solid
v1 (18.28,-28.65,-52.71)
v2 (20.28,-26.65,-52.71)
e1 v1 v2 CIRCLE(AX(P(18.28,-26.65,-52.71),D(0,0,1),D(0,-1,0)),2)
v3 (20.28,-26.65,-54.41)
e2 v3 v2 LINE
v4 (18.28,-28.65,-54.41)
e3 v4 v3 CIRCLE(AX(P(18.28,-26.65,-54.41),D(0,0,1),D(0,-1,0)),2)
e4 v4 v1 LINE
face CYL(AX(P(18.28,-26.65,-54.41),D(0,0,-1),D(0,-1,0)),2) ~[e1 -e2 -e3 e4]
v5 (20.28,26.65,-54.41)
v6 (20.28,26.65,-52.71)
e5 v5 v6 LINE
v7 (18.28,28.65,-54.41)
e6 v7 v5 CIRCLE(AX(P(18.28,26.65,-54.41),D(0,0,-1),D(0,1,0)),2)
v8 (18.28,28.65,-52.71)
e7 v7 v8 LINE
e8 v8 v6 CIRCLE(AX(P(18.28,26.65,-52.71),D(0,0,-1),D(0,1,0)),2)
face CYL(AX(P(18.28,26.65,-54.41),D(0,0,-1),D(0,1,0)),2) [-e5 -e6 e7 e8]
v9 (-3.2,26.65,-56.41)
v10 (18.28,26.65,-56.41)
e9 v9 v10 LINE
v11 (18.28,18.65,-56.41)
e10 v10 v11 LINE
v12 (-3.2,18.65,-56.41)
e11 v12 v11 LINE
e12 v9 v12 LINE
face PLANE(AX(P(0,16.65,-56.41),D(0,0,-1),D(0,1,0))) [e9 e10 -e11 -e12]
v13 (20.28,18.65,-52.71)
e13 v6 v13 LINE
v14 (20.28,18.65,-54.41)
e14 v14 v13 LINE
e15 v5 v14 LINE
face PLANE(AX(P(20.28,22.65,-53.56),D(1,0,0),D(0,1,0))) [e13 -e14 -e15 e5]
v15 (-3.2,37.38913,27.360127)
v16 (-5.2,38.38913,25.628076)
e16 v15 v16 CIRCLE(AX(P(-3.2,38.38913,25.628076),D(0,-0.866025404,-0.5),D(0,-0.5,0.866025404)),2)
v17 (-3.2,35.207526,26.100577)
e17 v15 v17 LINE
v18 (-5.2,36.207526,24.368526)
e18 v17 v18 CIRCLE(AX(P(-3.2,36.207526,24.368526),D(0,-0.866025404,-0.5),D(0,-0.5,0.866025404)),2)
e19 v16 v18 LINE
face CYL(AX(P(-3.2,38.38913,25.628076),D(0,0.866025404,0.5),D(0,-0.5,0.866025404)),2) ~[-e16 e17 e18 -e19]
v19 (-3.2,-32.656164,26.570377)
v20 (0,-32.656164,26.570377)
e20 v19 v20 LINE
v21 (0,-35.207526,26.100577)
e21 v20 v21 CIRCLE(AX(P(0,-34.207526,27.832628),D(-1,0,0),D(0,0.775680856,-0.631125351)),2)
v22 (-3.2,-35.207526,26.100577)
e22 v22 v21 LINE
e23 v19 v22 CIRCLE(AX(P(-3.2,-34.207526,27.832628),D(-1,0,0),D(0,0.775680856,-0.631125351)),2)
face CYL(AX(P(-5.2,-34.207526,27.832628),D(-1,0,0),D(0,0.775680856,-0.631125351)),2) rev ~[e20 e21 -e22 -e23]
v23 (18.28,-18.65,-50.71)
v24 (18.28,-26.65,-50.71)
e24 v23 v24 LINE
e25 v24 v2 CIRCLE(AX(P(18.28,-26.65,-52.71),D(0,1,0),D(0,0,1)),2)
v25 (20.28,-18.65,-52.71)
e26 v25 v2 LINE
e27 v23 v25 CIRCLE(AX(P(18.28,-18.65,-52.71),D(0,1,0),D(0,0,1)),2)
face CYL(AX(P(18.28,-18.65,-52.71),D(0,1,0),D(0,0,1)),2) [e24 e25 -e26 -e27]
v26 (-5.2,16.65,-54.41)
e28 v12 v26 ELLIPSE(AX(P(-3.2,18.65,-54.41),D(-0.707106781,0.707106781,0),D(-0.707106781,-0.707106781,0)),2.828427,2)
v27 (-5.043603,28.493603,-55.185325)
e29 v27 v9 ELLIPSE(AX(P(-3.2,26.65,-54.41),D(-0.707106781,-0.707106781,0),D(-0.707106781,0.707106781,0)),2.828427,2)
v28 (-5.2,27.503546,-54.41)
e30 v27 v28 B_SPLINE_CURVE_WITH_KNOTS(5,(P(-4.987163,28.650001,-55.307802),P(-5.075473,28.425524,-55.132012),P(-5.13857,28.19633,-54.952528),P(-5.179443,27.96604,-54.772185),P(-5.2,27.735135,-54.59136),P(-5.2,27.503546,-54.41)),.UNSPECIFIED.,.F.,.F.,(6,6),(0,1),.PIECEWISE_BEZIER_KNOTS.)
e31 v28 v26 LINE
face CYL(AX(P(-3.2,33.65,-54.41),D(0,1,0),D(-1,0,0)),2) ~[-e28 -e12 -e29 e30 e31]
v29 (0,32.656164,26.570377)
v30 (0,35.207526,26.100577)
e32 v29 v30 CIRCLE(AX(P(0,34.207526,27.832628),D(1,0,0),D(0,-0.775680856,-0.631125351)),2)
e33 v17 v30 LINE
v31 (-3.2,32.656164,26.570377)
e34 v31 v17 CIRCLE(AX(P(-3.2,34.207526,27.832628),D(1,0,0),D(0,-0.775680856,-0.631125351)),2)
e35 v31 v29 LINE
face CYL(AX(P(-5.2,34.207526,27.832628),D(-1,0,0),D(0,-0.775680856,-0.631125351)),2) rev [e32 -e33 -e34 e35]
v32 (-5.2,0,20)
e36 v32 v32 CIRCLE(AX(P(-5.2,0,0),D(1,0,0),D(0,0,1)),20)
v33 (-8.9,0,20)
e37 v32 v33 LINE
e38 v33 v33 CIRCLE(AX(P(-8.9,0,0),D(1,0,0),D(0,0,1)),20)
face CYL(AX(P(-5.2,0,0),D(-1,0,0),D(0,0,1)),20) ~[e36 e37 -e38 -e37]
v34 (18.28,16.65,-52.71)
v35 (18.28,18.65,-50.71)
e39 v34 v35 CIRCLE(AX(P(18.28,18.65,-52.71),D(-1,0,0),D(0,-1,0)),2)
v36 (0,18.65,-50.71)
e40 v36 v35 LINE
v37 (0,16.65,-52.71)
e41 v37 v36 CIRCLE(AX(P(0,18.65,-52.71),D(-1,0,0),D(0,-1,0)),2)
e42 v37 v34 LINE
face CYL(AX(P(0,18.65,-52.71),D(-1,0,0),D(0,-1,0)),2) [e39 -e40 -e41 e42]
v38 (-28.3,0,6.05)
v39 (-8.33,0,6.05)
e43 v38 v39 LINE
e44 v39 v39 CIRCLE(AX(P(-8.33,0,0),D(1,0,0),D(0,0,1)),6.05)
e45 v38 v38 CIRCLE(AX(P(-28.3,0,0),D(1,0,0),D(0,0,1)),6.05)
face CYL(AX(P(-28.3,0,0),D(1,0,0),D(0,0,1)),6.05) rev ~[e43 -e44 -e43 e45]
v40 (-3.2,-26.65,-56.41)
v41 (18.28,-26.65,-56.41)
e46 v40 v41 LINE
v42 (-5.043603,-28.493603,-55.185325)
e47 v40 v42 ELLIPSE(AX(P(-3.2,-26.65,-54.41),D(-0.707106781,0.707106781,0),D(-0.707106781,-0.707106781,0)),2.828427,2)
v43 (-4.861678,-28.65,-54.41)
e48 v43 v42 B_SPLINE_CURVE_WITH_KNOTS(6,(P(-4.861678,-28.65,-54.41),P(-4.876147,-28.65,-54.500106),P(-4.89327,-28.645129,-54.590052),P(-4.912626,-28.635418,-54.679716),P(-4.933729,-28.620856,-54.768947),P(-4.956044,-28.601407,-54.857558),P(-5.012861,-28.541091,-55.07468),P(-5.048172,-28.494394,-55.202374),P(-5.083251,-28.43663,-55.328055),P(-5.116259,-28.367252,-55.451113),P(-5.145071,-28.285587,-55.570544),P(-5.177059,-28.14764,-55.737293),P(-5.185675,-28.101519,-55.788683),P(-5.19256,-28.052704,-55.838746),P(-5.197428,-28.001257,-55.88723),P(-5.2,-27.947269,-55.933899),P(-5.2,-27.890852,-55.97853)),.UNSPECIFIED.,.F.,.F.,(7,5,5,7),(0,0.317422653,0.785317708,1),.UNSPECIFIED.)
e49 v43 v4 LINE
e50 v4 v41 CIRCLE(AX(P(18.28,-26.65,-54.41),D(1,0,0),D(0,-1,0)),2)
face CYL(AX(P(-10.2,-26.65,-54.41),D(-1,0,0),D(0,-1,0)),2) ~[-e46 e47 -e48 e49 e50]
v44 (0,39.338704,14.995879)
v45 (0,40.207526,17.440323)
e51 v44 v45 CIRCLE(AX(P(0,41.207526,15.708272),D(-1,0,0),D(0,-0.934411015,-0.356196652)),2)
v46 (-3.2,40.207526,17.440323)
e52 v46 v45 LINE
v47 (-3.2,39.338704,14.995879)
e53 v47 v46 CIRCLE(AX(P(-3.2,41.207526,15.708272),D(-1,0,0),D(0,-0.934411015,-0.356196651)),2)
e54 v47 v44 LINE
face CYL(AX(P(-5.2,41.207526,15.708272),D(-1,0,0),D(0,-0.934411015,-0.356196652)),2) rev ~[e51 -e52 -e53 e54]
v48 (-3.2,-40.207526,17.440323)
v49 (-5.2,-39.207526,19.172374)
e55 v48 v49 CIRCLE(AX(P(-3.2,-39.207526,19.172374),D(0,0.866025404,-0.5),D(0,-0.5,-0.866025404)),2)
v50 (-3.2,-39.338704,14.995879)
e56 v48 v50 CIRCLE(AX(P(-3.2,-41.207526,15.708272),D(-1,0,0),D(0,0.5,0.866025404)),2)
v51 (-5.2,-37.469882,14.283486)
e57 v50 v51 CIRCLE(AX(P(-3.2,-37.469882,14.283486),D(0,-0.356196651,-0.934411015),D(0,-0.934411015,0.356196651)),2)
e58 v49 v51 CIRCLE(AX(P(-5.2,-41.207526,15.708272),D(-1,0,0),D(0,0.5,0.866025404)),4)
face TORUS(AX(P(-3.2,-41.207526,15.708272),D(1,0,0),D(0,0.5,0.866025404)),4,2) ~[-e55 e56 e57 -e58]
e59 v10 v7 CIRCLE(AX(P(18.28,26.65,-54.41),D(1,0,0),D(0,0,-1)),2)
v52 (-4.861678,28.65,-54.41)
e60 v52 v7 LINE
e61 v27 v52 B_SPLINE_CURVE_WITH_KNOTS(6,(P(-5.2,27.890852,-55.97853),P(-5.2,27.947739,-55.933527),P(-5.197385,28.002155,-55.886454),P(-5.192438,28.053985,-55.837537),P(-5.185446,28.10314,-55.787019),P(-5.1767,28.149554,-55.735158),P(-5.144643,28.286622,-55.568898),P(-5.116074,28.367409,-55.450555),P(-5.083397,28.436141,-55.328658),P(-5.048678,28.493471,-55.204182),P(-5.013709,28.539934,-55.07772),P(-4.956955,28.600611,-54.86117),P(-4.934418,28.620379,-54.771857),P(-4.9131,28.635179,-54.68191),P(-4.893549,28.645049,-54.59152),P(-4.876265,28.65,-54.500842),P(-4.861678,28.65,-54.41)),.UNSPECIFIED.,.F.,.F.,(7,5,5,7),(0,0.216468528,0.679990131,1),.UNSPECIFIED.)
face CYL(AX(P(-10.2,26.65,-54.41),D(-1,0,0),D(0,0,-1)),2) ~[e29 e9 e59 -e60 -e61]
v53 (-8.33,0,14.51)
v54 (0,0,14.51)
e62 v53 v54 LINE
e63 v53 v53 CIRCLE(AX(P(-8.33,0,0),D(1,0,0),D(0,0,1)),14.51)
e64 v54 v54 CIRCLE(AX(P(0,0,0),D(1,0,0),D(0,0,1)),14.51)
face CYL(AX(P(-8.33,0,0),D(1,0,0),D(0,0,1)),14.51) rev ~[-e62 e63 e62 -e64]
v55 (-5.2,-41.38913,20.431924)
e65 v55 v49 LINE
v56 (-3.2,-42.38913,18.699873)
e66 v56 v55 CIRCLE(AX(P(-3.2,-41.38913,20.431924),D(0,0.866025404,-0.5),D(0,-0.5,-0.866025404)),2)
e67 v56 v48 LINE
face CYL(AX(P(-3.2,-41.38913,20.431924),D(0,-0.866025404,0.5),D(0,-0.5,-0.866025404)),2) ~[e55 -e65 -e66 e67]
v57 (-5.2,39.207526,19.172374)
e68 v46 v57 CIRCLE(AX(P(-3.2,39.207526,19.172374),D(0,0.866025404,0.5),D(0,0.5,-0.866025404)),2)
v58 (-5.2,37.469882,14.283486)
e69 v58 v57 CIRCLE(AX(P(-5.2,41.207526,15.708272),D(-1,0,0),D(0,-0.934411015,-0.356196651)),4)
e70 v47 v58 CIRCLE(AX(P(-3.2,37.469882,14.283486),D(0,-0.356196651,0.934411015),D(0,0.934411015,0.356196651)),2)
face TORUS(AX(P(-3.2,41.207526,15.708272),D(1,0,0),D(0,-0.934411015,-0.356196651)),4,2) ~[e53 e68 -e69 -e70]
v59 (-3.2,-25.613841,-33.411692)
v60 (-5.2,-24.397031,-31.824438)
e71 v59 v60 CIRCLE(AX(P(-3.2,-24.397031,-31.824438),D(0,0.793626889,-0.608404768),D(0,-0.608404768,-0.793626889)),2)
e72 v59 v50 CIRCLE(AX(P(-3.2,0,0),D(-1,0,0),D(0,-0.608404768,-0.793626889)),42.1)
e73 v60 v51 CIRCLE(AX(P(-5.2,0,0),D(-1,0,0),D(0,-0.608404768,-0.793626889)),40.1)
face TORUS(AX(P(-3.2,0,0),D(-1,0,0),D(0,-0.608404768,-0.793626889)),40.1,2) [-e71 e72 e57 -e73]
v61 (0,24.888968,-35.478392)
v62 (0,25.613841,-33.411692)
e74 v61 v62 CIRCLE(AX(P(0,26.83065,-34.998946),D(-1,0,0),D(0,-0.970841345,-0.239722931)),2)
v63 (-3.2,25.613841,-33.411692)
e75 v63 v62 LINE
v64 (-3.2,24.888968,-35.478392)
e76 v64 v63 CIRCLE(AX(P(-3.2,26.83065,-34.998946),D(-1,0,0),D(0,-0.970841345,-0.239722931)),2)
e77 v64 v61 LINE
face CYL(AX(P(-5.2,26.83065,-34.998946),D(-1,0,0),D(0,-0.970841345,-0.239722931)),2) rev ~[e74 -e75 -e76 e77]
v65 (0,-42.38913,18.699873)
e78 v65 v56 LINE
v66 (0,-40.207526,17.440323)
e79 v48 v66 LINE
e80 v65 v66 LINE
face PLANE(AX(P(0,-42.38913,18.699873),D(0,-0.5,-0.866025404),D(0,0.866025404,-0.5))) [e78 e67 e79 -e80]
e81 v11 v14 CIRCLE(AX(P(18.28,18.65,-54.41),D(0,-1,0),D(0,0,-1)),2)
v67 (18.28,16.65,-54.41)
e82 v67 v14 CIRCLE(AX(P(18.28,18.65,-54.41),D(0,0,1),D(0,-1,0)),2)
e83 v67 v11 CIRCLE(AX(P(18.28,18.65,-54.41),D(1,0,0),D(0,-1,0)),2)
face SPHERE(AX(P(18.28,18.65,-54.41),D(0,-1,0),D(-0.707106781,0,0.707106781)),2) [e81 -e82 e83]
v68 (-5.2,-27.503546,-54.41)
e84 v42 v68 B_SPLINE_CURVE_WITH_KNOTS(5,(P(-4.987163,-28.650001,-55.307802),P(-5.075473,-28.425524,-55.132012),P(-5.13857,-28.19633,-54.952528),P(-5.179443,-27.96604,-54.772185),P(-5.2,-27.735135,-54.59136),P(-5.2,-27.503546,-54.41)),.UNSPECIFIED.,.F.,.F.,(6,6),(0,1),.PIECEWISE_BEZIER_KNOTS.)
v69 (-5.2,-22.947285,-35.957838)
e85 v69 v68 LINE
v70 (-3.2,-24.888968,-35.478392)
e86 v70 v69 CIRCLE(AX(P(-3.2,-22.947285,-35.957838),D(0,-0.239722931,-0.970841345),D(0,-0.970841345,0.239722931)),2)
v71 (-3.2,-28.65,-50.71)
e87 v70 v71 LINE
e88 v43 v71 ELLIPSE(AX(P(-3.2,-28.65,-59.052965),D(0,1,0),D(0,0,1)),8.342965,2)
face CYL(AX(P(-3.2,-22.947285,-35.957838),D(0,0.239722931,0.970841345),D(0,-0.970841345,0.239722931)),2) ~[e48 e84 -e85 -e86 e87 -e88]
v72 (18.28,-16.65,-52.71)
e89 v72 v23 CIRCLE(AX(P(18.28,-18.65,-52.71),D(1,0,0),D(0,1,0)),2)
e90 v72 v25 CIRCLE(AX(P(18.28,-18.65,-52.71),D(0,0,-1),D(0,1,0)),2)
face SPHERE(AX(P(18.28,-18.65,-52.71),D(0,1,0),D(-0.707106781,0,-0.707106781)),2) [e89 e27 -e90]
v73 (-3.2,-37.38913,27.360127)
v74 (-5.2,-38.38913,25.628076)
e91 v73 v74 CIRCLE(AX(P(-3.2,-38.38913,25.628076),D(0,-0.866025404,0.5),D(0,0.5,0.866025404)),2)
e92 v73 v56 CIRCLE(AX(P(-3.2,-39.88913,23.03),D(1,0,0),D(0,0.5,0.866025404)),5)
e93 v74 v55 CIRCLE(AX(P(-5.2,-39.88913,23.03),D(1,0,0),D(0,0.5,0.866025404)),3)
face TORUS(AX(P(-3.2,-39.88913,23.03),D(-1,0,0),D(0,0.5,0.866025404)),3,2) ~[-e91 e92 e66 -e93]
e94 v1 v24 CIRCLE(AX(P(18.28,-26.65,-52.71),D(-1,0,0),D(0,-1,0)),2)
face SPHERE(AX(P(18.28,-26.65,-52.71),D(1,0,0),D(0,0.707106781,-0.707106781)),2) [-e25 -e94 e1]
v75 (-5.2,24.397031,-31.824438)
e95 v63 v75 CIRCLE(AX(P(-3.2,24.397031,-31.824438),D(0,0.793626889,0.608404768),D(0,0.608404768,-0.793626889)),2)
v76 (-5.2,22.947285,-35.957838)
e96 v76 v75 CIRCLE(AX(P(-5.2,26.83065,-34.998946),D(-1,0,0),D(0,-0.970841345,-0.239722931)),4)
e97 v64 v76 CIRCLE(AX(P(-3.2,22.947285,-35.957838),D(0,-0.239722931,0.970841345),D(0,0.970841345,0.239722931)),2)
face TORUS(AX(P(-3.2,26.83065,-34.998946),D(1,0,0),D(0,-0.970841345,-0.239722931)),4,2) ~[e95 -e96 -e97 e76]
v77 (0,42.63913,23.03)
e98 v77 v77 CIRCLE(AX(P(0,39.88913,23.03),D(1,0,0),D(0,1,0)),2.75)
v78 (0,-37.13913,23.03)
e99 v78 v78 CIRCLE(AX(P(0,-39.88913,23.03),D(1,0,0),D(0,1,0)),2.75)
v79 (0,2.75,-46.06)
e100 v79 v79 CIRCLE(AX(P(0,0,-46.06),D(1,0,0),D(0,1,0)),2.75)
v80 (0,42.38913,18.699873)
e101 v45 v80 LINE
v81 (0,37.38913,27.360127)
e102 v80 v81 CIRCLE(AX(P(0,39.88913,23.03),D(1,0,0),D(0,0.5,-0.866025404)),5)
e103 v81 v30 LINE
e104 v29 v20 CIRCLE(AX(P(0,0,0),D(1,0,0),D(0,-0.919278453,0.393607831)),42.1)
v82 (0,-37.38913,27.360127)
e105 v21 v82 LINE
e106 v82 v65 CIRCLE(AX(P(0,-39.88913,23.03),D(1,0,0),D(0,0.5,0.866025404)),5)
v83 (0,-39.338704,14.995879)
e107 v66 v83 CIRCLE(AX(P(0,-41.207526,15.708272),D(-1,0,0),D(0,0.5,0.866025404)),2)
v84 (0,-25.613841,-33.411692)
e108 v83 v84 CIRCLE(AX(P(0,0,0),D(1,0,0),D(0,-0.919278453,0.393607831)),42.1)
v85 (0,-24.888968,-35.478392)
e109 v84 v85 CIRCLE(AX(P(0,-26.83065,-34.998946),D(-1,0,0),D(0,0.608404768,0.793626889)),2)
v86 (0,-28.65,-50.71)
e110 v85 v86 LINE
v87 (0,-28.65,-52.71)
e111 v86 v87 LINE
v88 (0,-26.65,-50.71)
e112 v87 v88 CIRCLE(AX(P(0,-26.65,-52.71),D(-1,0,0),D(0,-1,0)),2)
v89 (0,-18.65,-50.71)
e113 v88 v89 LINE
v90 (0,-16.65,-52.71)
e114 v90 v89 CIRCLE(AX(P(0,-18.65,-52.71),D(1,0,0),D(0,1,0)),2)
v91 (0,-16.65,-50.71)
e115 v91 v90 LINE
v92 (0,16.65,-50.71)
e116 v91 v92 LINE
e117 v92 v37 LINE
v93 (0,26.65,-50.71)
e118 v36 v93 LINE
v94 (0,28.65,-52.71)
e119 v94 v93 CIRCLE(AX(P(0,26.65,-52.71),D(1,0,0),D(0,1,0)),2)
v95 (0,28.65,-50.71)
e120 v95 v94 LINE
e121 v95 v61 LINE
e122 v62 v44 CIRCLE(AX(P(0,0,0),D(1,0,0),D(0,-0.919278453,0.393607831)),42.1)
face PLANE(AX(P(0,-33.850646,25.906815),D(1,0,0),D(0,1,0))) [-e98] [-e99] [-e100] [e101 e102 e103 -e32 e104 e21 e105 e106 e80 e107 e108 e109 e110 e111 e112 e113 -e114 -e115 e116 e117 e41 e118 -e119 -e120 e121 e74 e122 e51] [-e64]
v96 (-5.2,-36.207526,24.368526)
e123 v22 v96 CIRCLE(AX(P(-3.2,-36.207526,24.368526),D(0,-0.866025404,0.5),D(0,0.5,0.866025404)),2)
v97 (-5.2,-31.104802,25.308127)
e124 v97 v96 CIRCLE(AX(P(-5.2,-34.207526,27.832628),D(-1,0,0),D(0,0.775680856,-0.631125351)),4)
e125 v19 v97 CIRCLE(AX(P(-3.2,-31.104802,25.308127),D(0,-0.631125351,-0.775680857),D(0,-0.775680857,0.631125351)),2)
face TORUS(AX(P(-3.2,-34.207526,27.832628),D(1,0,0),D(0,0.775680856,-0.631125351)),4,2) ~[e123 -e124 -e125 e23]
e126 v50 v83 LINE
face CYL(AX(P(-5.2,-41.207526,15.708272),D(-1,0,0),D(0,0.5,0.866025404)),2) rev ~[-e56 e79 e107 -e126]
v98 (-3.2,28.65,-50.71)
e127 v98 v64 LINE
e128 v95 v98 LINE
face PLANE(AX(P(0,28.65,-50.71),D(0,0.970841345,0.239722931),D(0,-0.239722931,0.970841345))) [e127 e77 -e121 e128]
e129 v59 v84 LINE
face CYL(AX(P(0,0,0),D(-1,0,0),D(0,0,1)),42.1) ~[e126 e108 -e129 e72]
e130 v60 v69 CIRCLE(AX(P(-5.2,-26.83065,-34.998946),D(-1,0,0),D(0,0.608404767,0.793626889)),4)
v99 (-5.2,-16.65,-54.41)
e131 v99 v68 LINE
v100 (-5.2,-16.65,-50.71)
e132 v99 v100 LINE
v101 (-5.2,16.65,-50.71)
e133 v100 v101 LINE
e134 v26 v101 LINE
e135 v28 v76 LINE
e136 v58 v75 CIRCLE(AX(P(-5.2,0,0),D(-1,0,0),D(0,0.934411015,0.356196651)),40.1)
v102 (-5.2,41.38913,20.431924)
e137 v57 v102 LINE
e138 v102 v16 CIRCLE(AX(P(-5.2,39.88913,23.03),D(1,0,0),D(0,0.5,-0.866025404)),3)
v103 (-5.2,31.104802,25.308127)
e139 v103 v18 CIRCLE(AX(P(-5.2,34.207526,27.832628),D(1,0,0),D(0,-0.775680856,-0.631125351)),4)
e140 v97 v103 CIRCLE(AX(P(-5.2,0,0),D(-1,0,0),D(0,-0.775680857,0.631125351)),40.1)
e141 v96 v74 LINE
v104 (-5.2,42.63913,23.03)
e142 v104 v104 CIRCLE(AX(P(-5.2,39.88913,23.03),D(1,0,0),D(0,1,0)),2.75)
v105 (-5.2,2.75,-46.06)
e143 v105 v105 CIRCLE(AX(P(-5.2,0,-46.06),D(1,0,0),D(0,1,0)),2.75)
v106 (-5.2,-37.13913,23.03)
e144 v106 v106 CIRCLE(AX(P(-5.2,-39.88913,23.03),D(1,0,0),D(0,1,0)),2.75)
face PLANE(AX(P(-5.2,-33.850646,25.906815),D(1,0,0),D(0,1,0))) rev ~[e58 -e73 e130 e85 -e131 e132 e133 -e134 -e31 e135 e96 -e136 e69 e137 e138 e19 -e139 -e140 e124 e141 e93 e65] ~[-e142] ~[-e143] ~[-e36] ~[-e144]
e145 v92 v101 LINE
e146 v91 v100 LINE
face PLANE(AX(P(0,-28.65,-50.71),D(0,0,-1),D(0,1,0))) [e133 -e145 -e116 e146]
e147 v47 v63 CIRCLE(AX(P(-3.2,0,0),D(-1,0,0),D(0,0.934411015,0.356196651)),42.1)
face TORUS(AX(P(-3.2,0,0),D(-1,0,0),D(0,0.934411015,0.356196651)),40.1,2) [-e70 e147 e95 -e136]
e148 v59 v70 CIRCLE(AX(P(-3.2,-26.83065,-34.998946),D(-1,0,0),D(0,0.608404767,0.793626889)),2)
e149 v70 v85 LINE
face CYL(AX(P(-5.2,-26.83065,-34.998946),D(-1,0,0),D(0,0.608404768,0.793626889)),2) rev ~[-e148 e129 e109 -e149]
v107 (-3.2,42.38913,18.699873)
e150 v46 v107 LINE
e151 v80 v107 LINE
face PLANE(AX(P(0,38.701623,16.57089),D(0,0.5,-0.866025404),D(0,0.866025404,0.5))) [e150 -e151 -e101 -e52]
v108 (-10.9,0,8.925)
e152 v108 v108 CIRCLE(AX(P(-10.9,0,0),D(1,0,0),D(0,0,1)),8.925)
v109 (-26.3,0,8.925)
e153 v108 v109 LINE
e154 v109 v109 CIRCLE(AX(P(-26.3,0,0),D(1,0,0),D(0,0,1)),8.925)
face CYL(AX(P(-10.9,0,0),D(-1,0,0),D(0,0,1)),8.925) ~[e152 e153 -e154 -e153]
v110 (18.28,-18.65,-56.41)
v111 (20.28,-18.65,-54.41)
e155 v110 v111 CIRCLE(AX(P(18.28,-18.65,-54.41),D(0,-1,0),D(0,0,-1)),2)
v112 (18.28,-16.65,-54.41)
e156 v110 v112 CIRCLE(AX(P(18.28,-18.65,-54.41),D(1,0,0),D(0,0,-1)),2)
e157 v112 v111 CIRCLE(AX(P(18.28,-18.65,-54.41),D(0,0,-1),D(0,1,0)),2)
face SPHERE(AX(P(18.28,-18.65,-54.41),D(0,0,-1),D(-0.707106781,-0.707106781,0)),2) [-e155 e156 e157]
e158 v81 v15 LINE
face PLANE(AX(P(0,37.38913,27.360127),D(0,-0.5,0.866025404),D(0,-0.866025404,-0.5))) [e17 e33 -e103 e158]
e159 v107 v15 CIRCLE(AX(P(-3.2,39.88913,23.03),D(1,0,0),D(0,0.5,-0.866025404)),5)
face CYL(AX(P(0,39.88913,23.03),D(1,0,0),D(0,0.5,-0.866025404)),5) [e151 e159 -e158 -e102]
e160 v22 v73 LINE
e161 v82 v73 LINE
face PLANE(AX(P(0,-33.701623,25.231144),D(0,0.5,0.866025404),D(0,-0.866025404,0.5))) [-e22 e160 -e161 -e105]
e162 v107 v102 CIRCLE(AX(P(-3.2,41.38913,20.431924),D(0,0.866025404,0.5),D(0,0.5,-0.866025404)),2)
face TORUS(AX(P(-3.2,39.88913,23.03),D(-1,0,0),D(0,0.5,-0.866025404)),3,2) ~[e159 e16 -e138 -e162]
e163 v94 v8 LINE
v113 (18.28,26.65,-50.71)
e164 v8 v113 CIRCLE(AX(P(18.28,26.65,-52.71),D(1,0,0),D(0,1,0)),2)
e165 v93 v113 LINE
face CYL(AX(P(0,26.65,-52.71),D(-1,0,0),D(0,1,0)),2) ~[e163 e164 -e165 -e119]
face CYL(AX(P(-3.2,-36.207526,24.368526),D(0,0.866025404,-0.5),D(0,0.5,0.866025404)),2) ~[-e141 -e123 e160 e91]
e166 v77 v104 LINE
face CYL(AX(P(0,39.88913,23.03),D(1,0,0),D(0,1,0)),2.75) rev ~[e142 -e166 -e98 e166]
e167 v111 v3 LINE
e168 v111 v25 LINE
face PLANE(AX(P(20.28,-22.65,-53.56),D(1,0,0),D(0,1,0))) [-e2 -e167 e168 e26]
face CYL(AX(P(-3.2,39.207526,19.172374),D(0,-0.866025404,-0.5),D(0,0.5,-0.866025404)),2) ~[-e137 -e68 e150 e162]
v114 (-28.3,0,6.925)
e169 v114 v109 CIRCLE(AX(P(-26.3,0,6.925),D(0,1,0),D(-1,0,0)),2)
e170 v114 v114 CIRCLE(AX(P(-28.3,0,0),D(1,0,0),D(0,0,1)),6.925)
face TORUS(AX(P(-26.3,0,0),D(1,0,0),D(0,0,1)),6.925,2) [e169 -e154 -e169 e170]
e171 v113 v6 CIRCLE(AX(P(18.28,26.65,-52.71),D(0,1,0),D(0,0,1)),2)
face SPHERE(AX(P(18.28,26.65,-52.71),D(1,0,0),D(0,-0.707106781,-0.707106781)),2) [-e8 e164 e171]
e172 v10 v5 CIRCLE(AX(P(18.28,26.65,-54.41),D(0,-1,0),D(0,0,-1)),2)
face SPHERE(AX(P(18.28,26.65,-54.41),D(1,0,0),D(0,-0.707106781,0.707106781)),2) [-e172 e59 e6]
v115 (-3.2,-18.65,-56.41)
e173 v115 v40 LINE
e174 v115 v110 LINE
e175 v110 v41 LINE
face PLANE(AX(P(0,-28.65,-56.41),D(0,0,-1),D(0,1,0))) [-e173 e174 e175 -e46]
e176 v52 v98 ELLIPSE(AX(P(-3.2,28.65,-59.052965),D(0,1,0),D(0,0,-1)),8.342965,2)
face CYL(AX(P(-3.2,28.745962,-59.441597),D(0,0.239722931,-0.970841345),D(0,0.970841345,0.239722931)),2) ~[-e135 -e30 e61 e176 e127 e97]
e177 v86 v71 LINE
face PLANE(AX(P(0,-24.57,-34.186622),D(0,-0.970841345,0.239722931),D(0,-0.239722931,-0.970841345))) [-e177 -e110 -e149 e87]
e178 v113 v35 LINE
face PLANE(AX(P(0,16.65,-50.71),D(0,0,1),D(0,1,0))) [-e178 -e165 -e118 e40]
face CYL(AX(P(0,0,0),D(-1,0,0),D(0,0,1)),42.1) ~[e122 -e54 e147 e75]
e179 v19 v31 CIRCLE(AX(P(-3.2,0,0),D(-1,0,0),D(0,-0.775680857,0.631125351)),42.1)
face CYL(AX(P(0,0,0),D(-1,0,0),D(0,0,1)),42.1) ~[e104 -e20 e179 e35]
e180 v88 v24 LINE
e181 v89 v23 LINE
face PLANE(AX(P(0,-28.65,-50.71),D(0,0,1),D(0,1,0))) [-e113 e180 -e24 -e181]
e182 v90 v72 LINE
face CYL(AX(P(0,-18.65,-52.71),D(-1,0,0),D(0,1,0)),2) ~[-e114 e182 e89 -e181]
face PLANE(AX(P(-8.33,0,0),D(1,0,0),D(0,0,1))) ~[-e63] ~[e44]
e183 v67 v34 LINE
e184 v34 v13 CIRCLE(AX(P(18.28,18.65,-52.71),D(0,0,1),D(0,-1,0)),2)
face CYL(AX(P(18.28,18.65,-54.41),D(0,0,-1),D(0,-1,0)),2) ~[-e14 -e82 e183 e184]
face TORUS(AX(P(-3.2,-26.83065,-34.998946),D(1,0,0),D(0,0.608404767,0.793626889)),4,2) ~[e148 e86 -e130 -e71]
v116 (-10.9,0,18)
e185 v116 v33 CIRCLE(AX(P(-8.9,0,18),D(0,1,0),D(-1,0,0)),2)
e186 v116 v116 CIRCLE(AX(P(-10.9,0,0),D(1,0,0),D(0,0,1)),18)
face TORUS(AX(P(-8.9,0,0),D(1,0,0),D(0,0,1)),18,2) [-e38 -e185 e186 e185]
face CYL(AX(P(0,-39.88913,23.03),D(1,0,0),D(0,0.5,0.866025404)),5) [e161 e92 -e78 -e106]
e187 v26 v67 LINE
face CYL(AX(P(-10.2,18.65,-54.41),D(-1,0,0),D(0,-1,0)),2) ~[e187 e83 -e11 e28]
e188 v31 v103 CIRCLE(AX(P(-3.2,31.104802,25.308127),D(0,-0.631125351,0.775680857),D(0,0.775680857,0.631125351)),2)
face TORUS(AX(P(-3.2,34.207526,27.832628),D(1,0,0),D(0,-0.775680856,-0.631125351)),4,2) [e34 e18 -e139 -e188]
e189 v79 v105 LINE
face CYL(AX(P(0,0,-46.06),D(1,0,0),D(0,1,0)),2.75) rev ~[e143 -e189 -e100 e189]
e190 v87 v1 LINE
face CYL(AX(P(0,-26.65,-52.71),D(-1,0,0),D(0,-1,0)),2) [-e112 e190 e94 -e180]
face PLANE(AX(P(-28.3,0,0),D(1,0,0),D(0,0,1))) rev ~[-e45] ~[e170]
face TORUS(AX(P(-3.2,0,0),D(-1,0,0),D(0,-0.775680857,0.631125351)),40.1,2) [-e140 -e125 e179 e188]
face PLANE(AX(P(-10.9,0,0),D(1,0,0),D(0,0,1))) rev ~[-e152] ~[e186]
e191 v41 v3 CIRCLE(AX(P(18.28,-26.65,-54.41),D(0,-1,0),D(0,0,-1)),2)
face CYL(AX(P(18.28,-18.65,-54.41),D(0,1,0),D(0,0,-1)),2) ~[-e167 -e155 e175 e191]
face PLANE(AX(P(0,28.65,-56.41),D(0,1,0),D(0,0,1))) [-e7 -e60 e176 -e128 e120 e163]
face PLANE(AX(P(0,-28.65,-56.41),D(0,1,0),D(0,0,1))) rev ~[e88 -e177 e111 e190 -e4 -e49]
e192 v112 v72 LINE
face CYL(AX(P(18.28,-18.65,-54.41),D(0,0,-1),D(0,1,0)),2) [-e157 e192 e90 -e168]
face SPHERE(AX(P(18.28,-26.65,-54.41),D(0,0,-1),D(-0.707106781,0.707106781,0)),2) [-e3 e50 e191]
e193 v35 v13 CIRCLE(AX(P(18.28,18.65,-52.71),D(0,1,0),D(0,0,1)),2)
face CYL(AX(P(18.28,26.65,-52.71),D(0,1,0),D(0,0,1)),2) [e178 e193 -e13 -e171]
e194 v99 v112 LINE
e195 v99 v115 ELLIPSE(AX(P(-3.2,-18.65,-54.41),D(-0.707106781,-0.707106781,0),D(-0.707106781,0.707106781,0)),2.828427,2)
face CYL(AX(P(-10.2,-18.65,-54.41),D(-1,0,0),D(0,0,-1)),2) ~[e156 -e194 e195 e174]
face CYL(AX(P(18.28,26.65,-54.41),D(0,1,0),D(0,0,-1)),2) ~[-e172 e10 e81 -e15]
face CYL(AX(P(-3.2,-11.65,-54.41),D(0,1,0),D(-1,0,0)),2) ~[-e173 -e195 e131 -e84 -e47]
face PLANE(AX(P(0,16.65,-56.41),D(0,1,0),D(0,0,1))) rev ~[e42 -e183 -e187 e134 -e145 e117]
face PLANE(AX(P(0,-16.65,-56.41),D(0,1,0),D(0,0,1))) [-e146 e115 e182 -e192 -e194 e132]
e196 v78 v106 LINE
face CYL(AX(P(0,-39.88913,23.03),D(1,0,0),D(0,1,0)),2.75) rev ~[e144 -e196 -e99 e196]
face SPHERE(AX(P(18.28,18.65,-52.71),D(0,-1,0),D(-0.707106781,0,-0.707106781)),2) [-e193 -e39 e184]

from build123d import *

# Parameters (mm, degrees)
F2_R          = 2.75
F3_DEPTH      = 5.2
F4_DEPTH      = 5.2
F5_DEPTH      = 5.2
F2_W          = 12
F2_H          = 5.7
F6_DEPTH      = 20.28
F6_DEPTH_BACK = 5.2
F7_T1_DEPTH   = 5.2
F7_T3_DEPTH   = 1.7
F7_T5_DEPTH   = 18.28
F7_T7_DEPTH   = 8
F7_T9_DEPTH   = 8
F7_T11_DEPTH  = 28.48
F7_T13_DEPTH  = 22
F7_T15_DEPTH  = 22
F7_S19_W      = 2.04
F7_S19_H      = 2.04
F7_T20_DEPTH  = 2.04
F7_S25_W      = 2.04
F7_S25_H      = 2.04
F7_T26_DEPTH  = 2.04
F7_S31_W      = 2.04
F7_S31_H      = 2.04
F7_T32_DEPTH  = 2.04
F7_S37_W      = 2.04
F7_S37_H      = 2.04
F7_T38_DEPTH  = 2.04
F7_S43_W      = 2.04
F7_S43_H      = 2.04
F7_T44_DEPTH  = 2.04
F7_S49_W      = 2.04
F7_S49_H      = 2.04
F7_T50_DEPTH  = 2.04
F7_S55_W      = 2.04
F7_S55_H      = 2.04
F7_T56_DEPTH  = 2.04
F7_S61_W      = 2.04
F7_S61_H      = 2.04
F7_T62_DEPTH  = 2.04
F7_T69_DEPTH  = 2.5190996878
F7_T71_DEPTH  = 2.5190996878
F7_T73_DEPTH  = 24.1890808372
F7_T75_DEPTH  = 24.1890808372
F7_T77_DEPTH  = 2.5190996878
F7_T79_DEPTH  = 2.5190996878
F7_T82_ANGLE  = 73.3925557793
F7_T84_ANGLE  = 101.7336044326
F7_T86_ANGLE  = 180
F7_T88_ANGLE  = 73.3925557793
F7_T90_ANGLE  = 180
F7_T92_ANGLE  = 80.8668022163
F7_T94_ANGLE  = 80.8668022163
F7_T96_ANGLE  = 66.3959416665
F7_T98_ANGLE  = 66.3959416665
F7_T100_ANGLE = 80.8668022163
F7_T102_ANGLE = 80.8668022163


# Not quite as in the source:
# - a fillet or chamfer that OpenCascade refuses, or shapes differently, is made with other operations: its cross-section is extruded or revolved along the edge and cut away or added


with BuildPart() as f1:
    # F0 (on Front) → F1 (revolve)
    with BuildSketch(Plane.XZ):
        Polygon((0, 14.51), (0, 42.1), (-5.2, 42.1), (-5.2, 20), (-10.9, 20), (-10.9, 8.925), (-28.3, 8.925), (-28.3, 6.05), (-8.33, 6.05), (-8.33, 14.51), align=None)
    revolve(axis=Axis((-6.4437054098, 0, 0), (1, 0, 0)))

    # F2 (on Right) → F3 (join, through all)
    with BuildSketch(Plane.YZ):
        with BuildLine():
            ThreePointArc((-38.7016228918, 16.5708897028), (-36.4596694993, 21.05), (-33.7016228918, 25.2311437406))
            Line((-33.7016228918, 25.2311437406), (-37.3891300983, 27.3601270189))
            ThreePointArc((-37.3891300983, 27.3601270189), (-44.2192571172, 25.53), (-42.3891300983, 18.6998729811))
            Line((-42.3891300983, 18.6998729811), (-38.7016228918, 16.5708897028))
        make_face()
        with Locations((-39.8891300983, 23.03)):
            Circle(F2_R, mode=Mode.SUBTRACT)
    extrude(amount=-F3_DEPTH)

    # F2 (on Right) → F4 (join, through all)
    with BuildSketch(Plane.YZ):
        with BuildLine():
            Line((38.7016228918, 16.5708897028), (42.3891300983, 18.6998729811))
            ThreePointArc((42.3891300983, 18.6998729811), (44.2192571172, 25.53), (37.3891300983, 27.3601270189))
            Line((37.3891300983, 27.3601270189), (33.7016228918, 25.2311437406))
            ThreePointArc((33.7016228918, 25.2311437406), (36.4596694993, 21.05), (38.7016228918, 16.5708897028))
        make_face()
        with Locations((39.8891300983, 23.03)):
            Circle(F2_R, mode=Mode.SUBTRACT)
    extrude(amount=-F4_DEPTH)

    # F2 (on Right) → F5 (join, through all)
    with BuildSketch(Plane.YZ):
        with BuildLine():
            ThreePointArc((24.57, -34.1866216523), (0, -42.1), (-24.57, -34.1866216523))
            Line((-24.57, -34.1866216523), (-28.65, -50.71))
            Line((-28.65, -50.71), (-16.65, -50.71))
            Line((-16.65, -50.71), (16.65, -50.71))
            Line((16.65, -50.71), (28.65, -50.71))
            Line((28.65, -50.71), (24.57, -34.1866216523))
        make_face()
        with Locations((0, -46.06)):
            Circle(F2_R, mode=Mode.SUBTRACT)
    extrude(amount=-F5_DEPTH)

    # F2 (on Right) → F6 (join, two sides)
    with BuildSketch(Plane.YZ) as f6_sk:
        with Locations((-22.65, -53.56)):
            Rectangle(F2_W, F2_H)
        with Locations((22.65, -53.56)):
            Rectangle(F2_W, F2_H)
    extrude(amount=F6_DEPTH)
    extrude(f6_sk.sketch, amount=-F6_DEPTH_BACK)

    # F7: fillet of radius 2 on 39 edges, made by hand

    # F7_s2 → F7_t1 (join)
    with BuildSketch(Plane.YZ.offset(-5.2)):
        with BuildLine():
            ThreePointArc((-32.6561640609, 26.5703772804), (-33.8453407807, 25.8656958459), (-35.207525774, 26.100577175))
            Line((-35.207525774, 26.100577175), (-33.7016228918, 25.2311437406))
            ThreePointArc((-33.7016228918, 25.2311437406), (-33.1856498947, 25.9060348387), (-32.6561640609, 26.5703772804))
        make_face()
        with BuildLine():
            ThreePointArc((-40.207525774, 17.4403231372), (-39.3230200794, 16.3780769929), (-39.3387037435, 14.9958790267))
            ThreePointArc((-39.3387037435, 14.9958790267), (-39.028109229, 15.7865984306), (-38.7016228918, 16.5708897028))
            Line((-38.7016228918, 16.5708897028), (-40.207525774, 17.4403231372))
        make_face()
        with BuildLine():
            ThreePointArc((32.6561640609, 26.5703772804), (33.8453407807, 25.8656958459), (35.207525774, 26.100577175))
            Line((35.207525774, 26.100577175), (33.7016228918, 25.2311437406))
            ThreePointArc((33.7016228918, 25.2311437406), (33.1856498947, 25.9060348387), (32.6561640609, 26.5703772804))
        make_face()
        with BuildLine():
            ThreePointArc((39.3387037435, 14.9958790267), (39.3230200794, 16.3780769929), (40.207525774, 17.4403231372))
            Line((40.207525774, 17.4403231372), (38.7016228918, 16.5708897028))
            ThreePointArc((38.7016228918, 16.5708897028), (39.028109229, 15.7865984306), (39.3387037435, 14.9958790267))
        make_face()
        with BuildLine():
            ThreePointArc((24.8889675585, -35.4783916643), (24.9433690993, -34.3370017965), (25.6138407126, -33.4116920246))
            ThreePointArc((25.6138407126, -33.4116920246), (25.0949117582, -33.8031862973), (24.57, -34.1866216523))
            Line((24.57, -34.1866216523), (24.8889675585, -35.4783916643))
        make_face()
        with BuildLine():
            ThreePointArc((-25.6138407126, -33.4116920246), (-24.9433690993, -34.3370017965), (-24.8889675585, -35.4783916643))
            Line((-24.8889675585, -35.4783916643), (-24.57, -34.1866216523))
            ThreePointArc((-24.57, -34.1866216523), (-25.0949117582, -33.8031862973), (-25.6138407126, -33.4116920246))
        make_face()
    extrude(amount=F7_T1_DEPTH)

    # F7_s4 → F7_t3 (cut)
    with BuildSketch(Plane.XY.offset(-54.41)):
        with BuildLine():
            ThreePointArc((18.28, -28.65), (19.6942135624, -28.0642135624), (20.28, -26.65))
            Line((20.28, -26.65), (20.28, -28.65))
            Line((20.28, -28.65), (18.28, -28.65))
        make_face()
        with BuildLine():
            ThreePointArc((18.28, -16.65), (19.6942135624, -17.2357864376), (20.28, -18.65))
            Line((20.28, -18.65), (20.28, -16.65))
            Line((20.28, -16.65), (18.28, -16.65))
        make_face()
        with BuildLine():
            ThreePointArc((18.28, 16.65), (19.6942135624, 17.2357864376), (20.28, 18.65))
            Line((20.28, 18.65), (20.28, 16.65))
            Line((20.28, 16.65), (18.28, 16.65))
        make_face()
        with BuildLine():
            ThreePointArc((18.28, 28.65), (19.6942135624, 28.0642135624), (20.28, 26.65))
            Line((20.28, 26.65), (20.28, 28.65))
            Line((20.28, 28.65), (18.28, 28.65))
        make_face()
    extrude(amount=F7_T3_DEPTH, mode=Mode.SUBTRACT)

    # F7_s6 → F7_t5 (cut)
    with BuildSketch(Plane.YZ):
        with BuildLine():
            ThreePointArc((-28.65, -52.71), (-28.0642135624, -51.2957864376), (-26.65, -50.71))
            Line((-26.65, -50.71), (-28.65, -50.71))
            Line((-28.65, -50.71), (-28.65, -52.71))
        make_face()
        with BuildLine():
            ThreePointArc((-16.65, -52.71), (-17.2357864376, -51.2957864376), (-18.65, -50.71))
            Line((-18.65, -50.71), (-16.65, -50.71))
            Line((-16.65, -50.71), (-16.65, -52.71))
        make_face()
        with BuildLine():
            ThreePointArc((16.65, -52.71), (17.2357864376, -51.2957864376), (18.65, -50.71))
            Line((18.65, -50.71), (16.65, -50.71))
            Line((16.65, -50.71), (16.65, -52.71))
        make_face()
        with BuildLine():
            ThreePointArc((28.65, -52.71), (28.0642135624, -51.2957864376), (26.65, -50.71))
            Line((26.65, -50.71), (28.65, -50.71))
            Line((28.65, -50.71), (28.65, -52.71))
        make_face()
    extrude(amount=F7_T5_DEPTH, mode=Mode.SUBTRACT)

    # F7_s8 → F7_t7 (cut)
    with BuildSketch(Plane.XZ.offset(18.65)):
        with BuildLine():
            ThreePointArc((18.28, -50.71), (19.6942135624, -51.2957864376), (20.28, -52.71))
            Line((20.28, -52.71), (20.28, -50.71))
            Line((20.28, -50.71), (18.28, -50.71))
        make_face()
        with BuildLine():
            ThreePointArc((18.28, -56.41), (19.6942135624, -55.8242135624), (20.28, -54.41))
            Line((20.28, -54.41), (20.28, -56.41))
            Line((20.28, -56.41), (18.28, -56.41))
        make_face()
    extrude(amount=F7_T7_DEPTH, mode=Mode.SUBTRACT)

    # F7_s10 → F7_t9 (cut)
    with BuildSketch(Plane.XZ.offset(-26.65)):
        with BuildLine():
            ThreePointArc((18.28, -50.71), (19.6942135624, -51.2957864376), (20.28, -52.71))
            Line((20.28, -52.71), (20.28, -50.71))
            Line((20.28, -50.71), (18.28, -50.71))
        make_face()
        with BuildLine():
            ThreePointArc((18.28, -56.41), (19.6942135624, -55.8242135624), (20.28, -54.41))
            Line((20.28, -54.41), (20.28, -56.41))
            Line((20.28, -56.41), (18.28, -56.41))
        make_face()
    extrude(amount=F7_T9_DEPTH, mode=Mode.SUBTRACT)

    # F7_s12 → F7_t11 (cut)
    with BuildSketch(Plane.YZ.offset(-10.2)):
        with BuildLine():
            ThreePointArc((-28.65, -54.41), (-28.0642135624, -55.8242135624), (-26.65, -56.41))
            Line((-26.65, -56.41), (-28.65, -56.41))
            Line((-28.65, -56.41), (-28.65, -54.41))
        make_face()
        with BuildLine():
            ThreePointArc((26.65, -56.41), (28.0642135624, -55.8242135624), (28.65, -54.41))
            Line((28.65, -54.41), (28.65, -56.41))
            Line((28.65, -56.41), (26.65, -56.41))
        make_face()
        with BuildLine():
            ThreePointArc((16.65, -54.41), (17.2357864376, -55.8242135624), (18.65, -56.41))
            Line((18.65, -56.41), (16.65, -56.41))
            Line((16.65, -56.41), (16.65, -54.41))
        make_face()
        with BuildLine():
            ThreePointArc((-18.65, -56.41), (-17.2357864376, -55.8242135624), (-16.65, -54.41))
            Line((-16.65, -54.41), (-16.65, -56.41))
            Line((-16.65, -56.41), (-18.65, -56.41))
        make_face()
    extrude(amount=F7_T11_DEPTH, mode=Mode.SUBTRACT)

    # F7_s14 → F7_t13 (cut)
    with BuildSketch(Plane.XZ.offset(11.65)):
        with BuildLine():
            ThreePointArc((-5.2, -54.41), (-4.6142135624, -55.8242135624), (-3.2, -56.41))
            Line((-3.2, -56.41), (-5.2, -56.41))
            Line((-5.2, -56.41), (-5.2, -54.41))
        make_face()
    extrude(amount=F7_T13_DEPTH, mode=Mode.SUBTRACT)

    # F7_s16 → F7_t15 (cut)
    with BuildSketch(Plane.XZ.offset(-33.65)):
        with BuildLine():
            ThreePointArc((-5.2, -54.41), (-4.6142135624, -55.8242135624), (-3.2, -56.41))
            Line((-3.2, -56.41), (-5.2, -56.41))
            Line((-5.2, -56.41), (-5.2, -54.41))
        make_face()
    extrude(amount=F7_T15_DEPTH, mode=Mode.SUBTRACT)


with BuildPart() as f7_tool18:
    # F7_s19 → F7_t20 (new body)
    with BuildSketch(Plane.YZ.offset(18.28)):
        with Locations((-27.67, -51.69)):
            Rectangle(F7_S19_W, F7_S19_H)
    extrude(amount=F7_T20_DEPTH)

    # F7_s21 → F7_t22 (revolve, cut)
    with BuildSketch(Plane(origin=(18.28, -26.65, -52.71), x_dir=(0, 0.7071067812, -0.7071067812), z_dir=(0, -0.7071067812, -0.7071067812))):
        with BuildLine():
            ThreePointArc((0, -2), (2, 0), (0, 2))
            Line((0, 2), (0, -2))
        make_face()
    revolve(axis=Axis((18.28, -26.65, -52.71), (1, 0, 0)), mode=Mode.SUBTRACT)


with BuildPart() as f1_1:
    add(f1.part)

    # F7_t17: cut F7_tool18
    add(f7_tool18.part, mode=Mode.SUBTRACT)


with BuildPart() as f7_tool24:
    # F7_s25 → F7_t26 (new body)
    with BuildSketch(Plane.XY.offset(-54.41)):
        with Locations((19.3, -27.67)):
            Rectangle(F7_S25_W, F7_S25_H)
    extrude(amount=-F7_T26_DEPTH)

    # F7_s27 → F7_t28 (revolve, cut)
    with BuildSketch(Plane(origin=(18.28, -26.65, -54.41), x_dir=(-0.7071067812, 0.7071067812, 0), z_dir=(-0.7071067812, -0.7071067812, 0))):
        with BuildLine():
            ThreePointArc((0, -2), (2, 0), (0, 2))
            Line((0, 2), (0, -2))
        make_face()
    revolve(axis=Axis((18.28, -26.65, -54.41), (0, 0, -1)), mode=Mode.SUBTRACT)


with BuildPart() as f1_2:
    add(f1_1.part)

    # F7_t23: cut F7_tool24
    add(f7_tool24.part, mode=Mode.SUBTRACT)


with BuildPart() as f7_tool30:
    # F7_s31 → F7_t32 (new body)
    with BuildSketch(Plane.XY.offset(-54.41)):
        with Locations((19.3, -17.63)):
            Rectangle(F7_S31_W, F7_S31_H)
    extrude(amount=-F7_T32_DEPTH)

    # F7_s33 → F7_t34 (revolve, cut)
    with BuildSketch(Plane(origin=(18.28, -18.65, -54.41), x_dir=(-0.7071067812, -0.7071067812, 0), z_dir=(0.7071067812, -0.7071067812, 0))):
        with BuildLine():
            ThreePointArc((0, -2), (2, 0), (0, 2))
            Line((0, 2), (0, -2))
        make_face()
    revolve(axis=Axis((18.28, -18.65, -54.41), (0, 0, -1)), mode=Mode.SUBTRACT)


with BuildPart() as f1_3:
    add(f1_2.part)

    # F7_t29: cut F7_tool30
    add(f7_tool30.part, mode=Mode.SUBTRACT)


with BuildPart() as f7_tool36:
    # F7_s37 → F7_t38 (new body)
    with BuildSketch(Plane.XZ.offset(18.65)):
        with Locations((19.3, -51.69)):
            Rectangle(F7_S37_W, F7_S37_H)
    extrude(amount=-F7_T38_DEPTH)

    # F7_s39 → F7_t40 (revolve, cut)
    with BuildSketch(Plane(origin=(18.28, -18.65, -52.71), x_dir=(-0.7071067812, 0, -0.7071067812), z_dir=(0.7071067812, 0, -0.7071067812))):
        with BuildLine():
            ThreePointArc((0, -2), (2, 0), (0, 2))
            Line((0, 2), (0, -2))
        make_face()
    revolve(axis=Axis((18.28, -18.65, -52.71), (0, 1, 0)), mode=Mode.SUBTRACT)


with BuildPart() as f1_4:
    add(f1_3.part)

    # F7_t35: cut F7_tool36
    add(f7_tool36.part, mode=Mode.SUBTRACT)


with BuildPart() as f7_tool42:
    # F7_s43 → F7_t44 (new body)
    with BuildSketch(Plane.XZ.offset(-18.65)):
        with Locations((19.3, -51.69)):
            Rectangle(F7_S43_W, F7_S43_H)
    extrude(amount=F7_T44_DEPTH)

    # F7_s45 → F7_t46 (revolve, cut)
    with BuildSketch(Plane(origin=(18.28, 18.65, -52.71), x_dir=(-0.7071067812, 0, -0.7071067812), z_dir=(-0.7071067812, 0, 0.7071067812))):
        with BuildLine():
            ThreePointArc((0, -2), (2, 0), (0, 2))
            Line((0, 2), (0, -2))
        make_face()
    revolve(axis=Axis((18.28, 18.65, -52.71), (0, -1, 0)), mode=Mode.SUBTRACT)


with BuildPart() as f1_5:
    add(f1_4.part)

    # F7_t41: cut F7_tool42
    add(f7_tool42.part, mode=Mode.SUBTRACT)


with BuildPart() as f7_tool48:
    # F7_s49 → F7_t50 (new body)
    with BuildSketch(Plane.XZ.offset(-18.65)):
        with Locations((19.3, -55.43)):
            Rectangle(F7_S49_W, F7_S49_H)
    extrude(amount=F7_T50_DEPTH)

    # F7_s51 → F7_t52 (revolve, cut)
    with BuildSketch(Plane(origin=(18.28, 18.65, -54.41), x_dir=(-0.7071067812, 0, 0.7071067812), z_dir=(0.7071067812, 0, 0.7071067812))):
        with BuildLine():
            ThreePointArc((0, -2), (2, 0), (0, 2))
            Line((0, 2), (0, -2))
        make_face()
    revolve(axis=Axis((18.28, 18.65, -54.41), (0, -1, 0)), mode=Mode.SUBTRACT)


with BuildPart() as f1_6:
    add(f1_5.part)

    # F7_t47: cut F7_tool48
    add(f7_tool48.part, mode=Mode.SUBTRACT)


with BuildPart() as f7_tool54:
    # F7_s55 → F7_t56 (new body)
    with BuildSketch(Plane.YZ.offset(18.28)):
        with Locations((27.67, -55.43)):
            Rectangle(F7_S55_W, F7_S55_H)
    extrude(amount=F7_T56_DEPTH)

    # F7_s57 → F7_t58 (revolve, cut)
    with BuildSketch(Plane(origin=(18.28, 26.65, -54.41), x_dir=(0, -0.7071067812, 0.7071067812), z_dir=(0, 0.7071067812, 0.7071067812))):
        with BuildLine():
            ThreePointArc((0, -2), (2, 0), (0, 2))
            Line((0, 2), (0, -2))
        make_face()
    revolve(axis=Axis((18.28, 26.65, -54.41), (1, 0, 0)), mode=Mode.SUBTRACT)


with BuildPart() as f1_7:
    add(f1_6.part)

    # F7_t53: cut F7_tool54
    add(f7_tool54.part, mode=Mode.SUBTRACT)


with BuildPart() as f7_tool60:
    # F7_s61 → F7_t62 (new body)
    with BuildSketch(Plane.YZ.offset(18.28)):
        with Locations((27.67, -51.69)):
            Rectangle(F7_S61_W, F7_S61_H)
    extrude(amount=F7_T62_DEPTH)

    # F7_s63 → F7_t64 (revolve, cut)
    with BuildSketch(Plane(origin=(18.28, 26.65, -52.71), x_dir=(0, -0.7071067812, -0.7071067812), z_dir=(0, -0.7071067812, 0.7071067812))):
        with BuildLine():
            ThreePointArc((0, -2), (2, 0), (0, 2))
            Line((0, 2), (0, -2))
        make_face()
    revolve(axis=Axis((18.28, 26.65, -52.71), (1, 0, 0)), mode=Mode.SUBTRACT)


with BuildPart() as f1_8:
    add(f1_7.part)

    # F7_t59: cut F7_tool60
    add(f7_tool60.part, mode=Mode.SUBTRACT)

    # F7_s65 → F7_t66 (revolve, cut)
    with BuildSketch(Plane.XZ):
        with BuildLine():
            ThreePointArc((-10.9, 18), (-10.3142135624, 19.4142135624), (-8.9, 20))
            Line((-8.9, 20), (-10.9, 20))
            Line((-10.9, 20), (-10.9, 18))
        make_face()
    revolve(axis=Axis((-10.9, 0, 0), (1, 0, 0)), mode=Mode.SUBTRACT)

    # F7_s67 → F7_t68 (revolve, cut)
    with BuildSketch(Plane.XZ):
        with BuildLine():
            ThreePointArc((-28.3, 6.925), (-27.7142135624, 8.3392135624), (-26.3, 8.925))
            Line((-26.3, 8.925), (-28.3, 8.925))
            Line((-28.3, 8.925), (-28.3, 6.925))
        make_face()
    revolve(axis=Axis((-28.3, 0, 0), (1, 0, 0)), mode=Mode.SUBTRACT)

    # F7_s70 → F7_t69 (cut)
    with BuildSketch(Plane(origin=(0, -37.707525774, 21.7704501561), x_dir=(1, 0, 0), z_dir=(0, -0.8660254038, 0.5))):
        with BuildLine():
            ThreePointArc((-3.2, 5), (-4.6142135624, 4.4142135624), (-5.2, 3))
            Line((-5.2, 3), (-5.2, 5))
            Line((-5.2, 5), (-3.2, 5))
        make_face()
    extrude(amount=F7_T69_DEPTH, mode=Mode.SUBTRACT)

    # F7_s72 → F7_t71 (cut)
    with BuildSketch(Plane(origin=(0, -39.8891300983, 23.03), x_dir=(1, 0, 0), z_dir=(0, 0.8660254038, -0.5))):
        with BuildLine():
            ThreePointArc((-3.2, 5), (-4.6142135624, 4.4142135624), (-5.2, 3))
            Line((-5.2, 3), (-5.2, 5))
            Line((-5.2, 5), (-3.2, 5))
        make_face()
    extrude(amount=F7_T71_DEPTH, mode=Mode.SUBTRACT)

    # F7_s74 → F7_t73 (cut)
    with BuildSketch(Plane(origin=(0, -9.6872865146, -39.2320343731), x_dir=(1, 0, 0), z_dir=(0, -0.2397229309, -0.9708413446))):
        with BuildLine():
            ThreePointArc((-3.2, 15.6582546967), (-4.6142135624, 15.072468259), (-5.2, 13.6582546967))
            Line((-5.2, 13.6582546967), (-5.2, 15.6582546967))
            Line((-5.2, 15.6582546967), (-3.2, 15.6582546967))
        make_face()
    extrude(amount=F7_T73_DEPTH, mode=Mode.SUBTRACT)

    # F7_s76 → F7_t75 (cut)
    with BuildSketch(Plane(origin=(0, 15.4859638688, -62.7157941379), x_dir=(1, 0, 0), z_dir=(0, -0.2397229309, 0.9708413446))):
        with BuildLine():
            ThreePointArc((-3.2, 15.6582546967), (-4.6142135624, 15.072468259), (-5.2, 13.6582546967))
            Line((-5.2, 13.6582546967), (-5.2, 15.6582546967))
            Line((-5.2, 15.6582546967), (-3.2, 15.6582546967))
        make_face()
    extrude(amount=F7_T75_DEPTH, mode=Mode.SUBTRACT)

    # F7_s78 → F7_t77 (cut)
    with BuildSketch(Plane(origin=(0, 37.707525774, 21.7704501561), x_dir=(1, 0, 0), z_dir=(0, 0.8660254038, 0.5))):
        with BuildLine():
            ThreePointArc((-3.2, 5), (-4.6142135624, 4.4142135624), (-5.2, 3))
            Line((-5.2, 3), (-5.2, 5))
            Line((-5.2, 5), (-3.2, 5))
        make_face()
    extrude(amount=F7_T77_DEPTH, mode=Mode.SUBTRACT)

    # F7_s80 → F7_t79 (cut)
    with BuildSketch(Plane(origin=(0, 39.8891300983, 23.03), x_dir=(1, 0, 0), z_dir=(0, -0.8660254038, -0.5))):
        with BuildLine():
            ThreePointArc((-3.2, 5), (-4.6142135624, 4.4142135624), (-5.2, 3))
            Line((-5.2, 3), (-5.2, 5))
            Line((-5.2, 5), (-3.2, 5))
        make_face()
    extrude(amount=F7_T79_DEPTH, mode=Mode.SUBTRACT)

    # F7_s81 → F7_t82 (revolve, cut)
    with BuildSketch(Plane(origin=(0, 0, 0), x_dir=(1, 0, 0), z_dir=(0, 0.7936268889, -0.6084047675))):
        with BuildLine():
            ThreePointArc((-3.2, 42.1), (-4.6142135624, 41.5142135624), (-5.2, 40.1))
            Line((-5.2, 40.1), (-5.2, 42.1))
            Line((-5.2, 42.1), (-3.2, 42.1))
        make_face()
    revolve(axis=Axis((-5.2, 0, 0), (-1, 0, 0)), revolution_arc=F7_T82_ANGLE, mode=Mode.SUBTRACT)

    # F7_s83 → F7_t84 (revolve, cut)
    with BuildSketch(Plane(origin=(0, 0, 0), x_dir=(1, 0, 0), z_dir=(0, -0.6311253511, -0.7756808566))):
        with BuildLine():
            ThreePointArc((-3.2, 42.1), (-4.6142135624, 41.5142135624), (-5.2, 40.1))
            Line((-5.2, 40.1), (-5.2, 42.1))
            Line((-5.2, 42.1), (-3.2, 42.1))
        make_face()
    revolve(axis=Axis((-5.2, 0, 0), (-1, 0, 0)), revolution_arc=F7_T84_ANGLE, mode=Mode.SUBTRACT)

    # F7_s85 → F7_t86 (revolve, cut)
    with BuildSketch(Plane(origin=(0, -39.8891300983, 23.03), x_dir=(1, 0, 0), z_dir=(0, 0.8660254038, -0.5))):
        with BuildLine():
            ThreePointArc((-3.2, -5), (-4.6142135624, -4.4142135624), (-5.2, -3))
            Line((-5.2, -3), (-5.2, -5))
            Line((-5.2, -5), (-3.2, -5))
        make_face()
    revolve(axis=Axis((-5.2, -39.8891300983, 23.03), (1, 0, 0)), revolution_arc=F7_T86_ANGLE, mode=Mode.SUBTRACT)

    # F7_s87 → F7_t88 (revolve, cut)
    with BuildSketch(Plane(origin=(0, 0, 0), x_dir=(1, 0, 0), z_dir=(0, -0.3561966515, 0.9344110153))):
        with BuildLine():
            ThreePointArc((-3.2, 42.1), (-4.6142135624, 41.5142135624), (-5.2, 40.1))
            Line((-5.2, 40.1), (-5.2, 42.1))
            Line((-5.2, 42.1), (-3.2, 42.1))
        make_face()
    revolve(axis=Axis((-5.2, 0, 0), (-1, 0, 0)), revolution_arc=F7_T88_ANGLE, mode=Mode.SUBTRACT)

    # F7_s89 → F7_t90 (revolve, cut)
    with BuildSketch(Plane(origin=(0, 39.8891300983, 23.03), x_dir=(1, 0, 0), z_dir=(0, -0.8660254038, -0.5))):
        with BuildLine():
            ThreePointArc((-3.2, -5), (-4.6142135624, -4.4142135624), (-5.2, -3))
            Line((-5.2, -3), (-5.2, -5))
            Line((-5.2, -5), (-3.2, -5))
        make_face()
    revolve(axis=Axis((-5.2, 39.8891300983, 23.03), (1, 0, 0)), revolution_arc=F7_T90_ANGLE, mode=Mode.SUBTRACT)

    # F7_s91 → F7_t92 (revolve, cut)
    with BuildSketch(Plane(origin=(0, 0, 0), x_dir=(1, 0, 0), z_dir=(0, -0.6311253511, 0.7756808566))):
        with BuildLine():
            ThreePointArc((-3.2, 42.1), (-4.6142135624, 41.5142135624), (-5.2, 40.1))
            Line((-5.2, 40.1), (-5.2, 42.1))
            Line((-5.2, 42.1), (-3.2, 42.1))
        make_face()
    revolve(axis=Axis((-5.2, 34.207525774, 27.8326279826), (1, 0, 0)), revolution_arc=F7_T92_ANGLE, mode=Mode.SUBTRACT)

    # F7_s93 → F7_t94 (revolve, cut)
    with BuildSketch(Plane(origin=(0, 0, 0), x_dir=(1, 0, 0), z_dir=(0, 0.3561966515, -0.9344110153))):
        with BuildLine():
            ThreePointArc((-3.2, -42.1), (-4.6142135624, -41.5142135624), (-5.2, -40.1))
            Line((-5.2, -40.1), (-5.2, -42.1))
            Line((-5.2, -42.1), (-3.2, -42.1))
        make_face()
    revolve(axis=Axis((-5.2, 41.207525774, 15.7082723296), (-1, 0, 0)), revolution_arc=F7_T94_ANGLE, mode=Mode.SUBTRACT)

    # F7_s95 → F7_t96 (revolve, cut)
    with BuildSketch(Plane(origin=(0, 9.6872865146, -39.2320343731), x_dir=(1, 0, 0), z_dir=(0, 0.2397229309, -0.9708413446))):
        with BuildLine():
            ThreePointArc((-3.2, -15.6582546967), (-4.6142135624, -15.072468259), (-5.2, -13.6582546967))
            Line((-5.2, -13.6582546967), (-5.2, -15.6582546967))
            Line((-5.2, -15.6582546967), (-3.2, -15.6582546967))
        make_face()
    revolve(axis=Axis((-5.2, 26.8306502477, -34.9989458025), (-1, 0, 0)), revolution_arc=F7_T96_ANGLE, mode=Mode.SUBTRACT)

    # F7_s97 → F7_t98 (revolve, cut)
    with BuildSketch(Plane(origin=(0, 0, 0), x_dir=(1, 0, 0), z_dir=(0, -0.7936268889, 0.6084047675))):
        with BuildLine():
            ThreePointArc((-3.2, -42.1), (-4.6142135624, -41.5142135624), (-5.2, -40.1))
            Line((-5.2, -40.1), (-5.2, -42.1))
            Line((-5.2, -42.1), (-3.2, -42.1))
        make_face()
    revolve(axis=Axis((-5.2, -26.8306502477, -34.9989458025), (-1, 0, 0)), revolution_arc=F7_T98_ANGLE, mode=Mode.SUBTRACT)

    # F7_s99 → F7_t100 (revolve, cut)
    with BuildSketch(Plane(origin=(0, -37.707525774, 21.7704501561), x_dir=(1, 0, 0), z_dir=(0, -0.8660254038, 0.5))):
        with BuildLine():
            ThreePointArc((-3.2, -5), (-4.6142135624, -4.4142135624), (-5.2, -3))
            Line((-5.2, -3), (-5.2, -5))
            Line((-5.2, -5), (-3.2, -5))
        make_face()
    revolve(axis=Axis((-5.2, -41.207525774, 15.7082723296), (-1, 0, 0)), revolution_arc=F7_T100_ANGLE, mode=Mode.SUBTRACT)

    # F7_s101 → F7_t102 (revolve, cut)
    with BuildSketch(Plane(origin=(0, 0, 0), x_dir=(1, 0, 0), z_dir=(0, 0.6311253511, 0.7756808566))):
        with BuildLine():
            ThreePointArc((-3.2, -42.1), (-4.6142135624, -41.5142135624), (-5.2, -40.1))
            Line((-5.2, -40.1), (-5.2, -42.1))
            Line((-5.2, -42.1), (-3.2, -42.1))
        make_face()
    revolve(axis=Axis((-5.2, -34.207525774, 27.8326279826), (-1, 0, 0)), revolution_arc=F7_T102_ANGLE, mode=Mode.SUBTRACT)


solid = f1_8.part
